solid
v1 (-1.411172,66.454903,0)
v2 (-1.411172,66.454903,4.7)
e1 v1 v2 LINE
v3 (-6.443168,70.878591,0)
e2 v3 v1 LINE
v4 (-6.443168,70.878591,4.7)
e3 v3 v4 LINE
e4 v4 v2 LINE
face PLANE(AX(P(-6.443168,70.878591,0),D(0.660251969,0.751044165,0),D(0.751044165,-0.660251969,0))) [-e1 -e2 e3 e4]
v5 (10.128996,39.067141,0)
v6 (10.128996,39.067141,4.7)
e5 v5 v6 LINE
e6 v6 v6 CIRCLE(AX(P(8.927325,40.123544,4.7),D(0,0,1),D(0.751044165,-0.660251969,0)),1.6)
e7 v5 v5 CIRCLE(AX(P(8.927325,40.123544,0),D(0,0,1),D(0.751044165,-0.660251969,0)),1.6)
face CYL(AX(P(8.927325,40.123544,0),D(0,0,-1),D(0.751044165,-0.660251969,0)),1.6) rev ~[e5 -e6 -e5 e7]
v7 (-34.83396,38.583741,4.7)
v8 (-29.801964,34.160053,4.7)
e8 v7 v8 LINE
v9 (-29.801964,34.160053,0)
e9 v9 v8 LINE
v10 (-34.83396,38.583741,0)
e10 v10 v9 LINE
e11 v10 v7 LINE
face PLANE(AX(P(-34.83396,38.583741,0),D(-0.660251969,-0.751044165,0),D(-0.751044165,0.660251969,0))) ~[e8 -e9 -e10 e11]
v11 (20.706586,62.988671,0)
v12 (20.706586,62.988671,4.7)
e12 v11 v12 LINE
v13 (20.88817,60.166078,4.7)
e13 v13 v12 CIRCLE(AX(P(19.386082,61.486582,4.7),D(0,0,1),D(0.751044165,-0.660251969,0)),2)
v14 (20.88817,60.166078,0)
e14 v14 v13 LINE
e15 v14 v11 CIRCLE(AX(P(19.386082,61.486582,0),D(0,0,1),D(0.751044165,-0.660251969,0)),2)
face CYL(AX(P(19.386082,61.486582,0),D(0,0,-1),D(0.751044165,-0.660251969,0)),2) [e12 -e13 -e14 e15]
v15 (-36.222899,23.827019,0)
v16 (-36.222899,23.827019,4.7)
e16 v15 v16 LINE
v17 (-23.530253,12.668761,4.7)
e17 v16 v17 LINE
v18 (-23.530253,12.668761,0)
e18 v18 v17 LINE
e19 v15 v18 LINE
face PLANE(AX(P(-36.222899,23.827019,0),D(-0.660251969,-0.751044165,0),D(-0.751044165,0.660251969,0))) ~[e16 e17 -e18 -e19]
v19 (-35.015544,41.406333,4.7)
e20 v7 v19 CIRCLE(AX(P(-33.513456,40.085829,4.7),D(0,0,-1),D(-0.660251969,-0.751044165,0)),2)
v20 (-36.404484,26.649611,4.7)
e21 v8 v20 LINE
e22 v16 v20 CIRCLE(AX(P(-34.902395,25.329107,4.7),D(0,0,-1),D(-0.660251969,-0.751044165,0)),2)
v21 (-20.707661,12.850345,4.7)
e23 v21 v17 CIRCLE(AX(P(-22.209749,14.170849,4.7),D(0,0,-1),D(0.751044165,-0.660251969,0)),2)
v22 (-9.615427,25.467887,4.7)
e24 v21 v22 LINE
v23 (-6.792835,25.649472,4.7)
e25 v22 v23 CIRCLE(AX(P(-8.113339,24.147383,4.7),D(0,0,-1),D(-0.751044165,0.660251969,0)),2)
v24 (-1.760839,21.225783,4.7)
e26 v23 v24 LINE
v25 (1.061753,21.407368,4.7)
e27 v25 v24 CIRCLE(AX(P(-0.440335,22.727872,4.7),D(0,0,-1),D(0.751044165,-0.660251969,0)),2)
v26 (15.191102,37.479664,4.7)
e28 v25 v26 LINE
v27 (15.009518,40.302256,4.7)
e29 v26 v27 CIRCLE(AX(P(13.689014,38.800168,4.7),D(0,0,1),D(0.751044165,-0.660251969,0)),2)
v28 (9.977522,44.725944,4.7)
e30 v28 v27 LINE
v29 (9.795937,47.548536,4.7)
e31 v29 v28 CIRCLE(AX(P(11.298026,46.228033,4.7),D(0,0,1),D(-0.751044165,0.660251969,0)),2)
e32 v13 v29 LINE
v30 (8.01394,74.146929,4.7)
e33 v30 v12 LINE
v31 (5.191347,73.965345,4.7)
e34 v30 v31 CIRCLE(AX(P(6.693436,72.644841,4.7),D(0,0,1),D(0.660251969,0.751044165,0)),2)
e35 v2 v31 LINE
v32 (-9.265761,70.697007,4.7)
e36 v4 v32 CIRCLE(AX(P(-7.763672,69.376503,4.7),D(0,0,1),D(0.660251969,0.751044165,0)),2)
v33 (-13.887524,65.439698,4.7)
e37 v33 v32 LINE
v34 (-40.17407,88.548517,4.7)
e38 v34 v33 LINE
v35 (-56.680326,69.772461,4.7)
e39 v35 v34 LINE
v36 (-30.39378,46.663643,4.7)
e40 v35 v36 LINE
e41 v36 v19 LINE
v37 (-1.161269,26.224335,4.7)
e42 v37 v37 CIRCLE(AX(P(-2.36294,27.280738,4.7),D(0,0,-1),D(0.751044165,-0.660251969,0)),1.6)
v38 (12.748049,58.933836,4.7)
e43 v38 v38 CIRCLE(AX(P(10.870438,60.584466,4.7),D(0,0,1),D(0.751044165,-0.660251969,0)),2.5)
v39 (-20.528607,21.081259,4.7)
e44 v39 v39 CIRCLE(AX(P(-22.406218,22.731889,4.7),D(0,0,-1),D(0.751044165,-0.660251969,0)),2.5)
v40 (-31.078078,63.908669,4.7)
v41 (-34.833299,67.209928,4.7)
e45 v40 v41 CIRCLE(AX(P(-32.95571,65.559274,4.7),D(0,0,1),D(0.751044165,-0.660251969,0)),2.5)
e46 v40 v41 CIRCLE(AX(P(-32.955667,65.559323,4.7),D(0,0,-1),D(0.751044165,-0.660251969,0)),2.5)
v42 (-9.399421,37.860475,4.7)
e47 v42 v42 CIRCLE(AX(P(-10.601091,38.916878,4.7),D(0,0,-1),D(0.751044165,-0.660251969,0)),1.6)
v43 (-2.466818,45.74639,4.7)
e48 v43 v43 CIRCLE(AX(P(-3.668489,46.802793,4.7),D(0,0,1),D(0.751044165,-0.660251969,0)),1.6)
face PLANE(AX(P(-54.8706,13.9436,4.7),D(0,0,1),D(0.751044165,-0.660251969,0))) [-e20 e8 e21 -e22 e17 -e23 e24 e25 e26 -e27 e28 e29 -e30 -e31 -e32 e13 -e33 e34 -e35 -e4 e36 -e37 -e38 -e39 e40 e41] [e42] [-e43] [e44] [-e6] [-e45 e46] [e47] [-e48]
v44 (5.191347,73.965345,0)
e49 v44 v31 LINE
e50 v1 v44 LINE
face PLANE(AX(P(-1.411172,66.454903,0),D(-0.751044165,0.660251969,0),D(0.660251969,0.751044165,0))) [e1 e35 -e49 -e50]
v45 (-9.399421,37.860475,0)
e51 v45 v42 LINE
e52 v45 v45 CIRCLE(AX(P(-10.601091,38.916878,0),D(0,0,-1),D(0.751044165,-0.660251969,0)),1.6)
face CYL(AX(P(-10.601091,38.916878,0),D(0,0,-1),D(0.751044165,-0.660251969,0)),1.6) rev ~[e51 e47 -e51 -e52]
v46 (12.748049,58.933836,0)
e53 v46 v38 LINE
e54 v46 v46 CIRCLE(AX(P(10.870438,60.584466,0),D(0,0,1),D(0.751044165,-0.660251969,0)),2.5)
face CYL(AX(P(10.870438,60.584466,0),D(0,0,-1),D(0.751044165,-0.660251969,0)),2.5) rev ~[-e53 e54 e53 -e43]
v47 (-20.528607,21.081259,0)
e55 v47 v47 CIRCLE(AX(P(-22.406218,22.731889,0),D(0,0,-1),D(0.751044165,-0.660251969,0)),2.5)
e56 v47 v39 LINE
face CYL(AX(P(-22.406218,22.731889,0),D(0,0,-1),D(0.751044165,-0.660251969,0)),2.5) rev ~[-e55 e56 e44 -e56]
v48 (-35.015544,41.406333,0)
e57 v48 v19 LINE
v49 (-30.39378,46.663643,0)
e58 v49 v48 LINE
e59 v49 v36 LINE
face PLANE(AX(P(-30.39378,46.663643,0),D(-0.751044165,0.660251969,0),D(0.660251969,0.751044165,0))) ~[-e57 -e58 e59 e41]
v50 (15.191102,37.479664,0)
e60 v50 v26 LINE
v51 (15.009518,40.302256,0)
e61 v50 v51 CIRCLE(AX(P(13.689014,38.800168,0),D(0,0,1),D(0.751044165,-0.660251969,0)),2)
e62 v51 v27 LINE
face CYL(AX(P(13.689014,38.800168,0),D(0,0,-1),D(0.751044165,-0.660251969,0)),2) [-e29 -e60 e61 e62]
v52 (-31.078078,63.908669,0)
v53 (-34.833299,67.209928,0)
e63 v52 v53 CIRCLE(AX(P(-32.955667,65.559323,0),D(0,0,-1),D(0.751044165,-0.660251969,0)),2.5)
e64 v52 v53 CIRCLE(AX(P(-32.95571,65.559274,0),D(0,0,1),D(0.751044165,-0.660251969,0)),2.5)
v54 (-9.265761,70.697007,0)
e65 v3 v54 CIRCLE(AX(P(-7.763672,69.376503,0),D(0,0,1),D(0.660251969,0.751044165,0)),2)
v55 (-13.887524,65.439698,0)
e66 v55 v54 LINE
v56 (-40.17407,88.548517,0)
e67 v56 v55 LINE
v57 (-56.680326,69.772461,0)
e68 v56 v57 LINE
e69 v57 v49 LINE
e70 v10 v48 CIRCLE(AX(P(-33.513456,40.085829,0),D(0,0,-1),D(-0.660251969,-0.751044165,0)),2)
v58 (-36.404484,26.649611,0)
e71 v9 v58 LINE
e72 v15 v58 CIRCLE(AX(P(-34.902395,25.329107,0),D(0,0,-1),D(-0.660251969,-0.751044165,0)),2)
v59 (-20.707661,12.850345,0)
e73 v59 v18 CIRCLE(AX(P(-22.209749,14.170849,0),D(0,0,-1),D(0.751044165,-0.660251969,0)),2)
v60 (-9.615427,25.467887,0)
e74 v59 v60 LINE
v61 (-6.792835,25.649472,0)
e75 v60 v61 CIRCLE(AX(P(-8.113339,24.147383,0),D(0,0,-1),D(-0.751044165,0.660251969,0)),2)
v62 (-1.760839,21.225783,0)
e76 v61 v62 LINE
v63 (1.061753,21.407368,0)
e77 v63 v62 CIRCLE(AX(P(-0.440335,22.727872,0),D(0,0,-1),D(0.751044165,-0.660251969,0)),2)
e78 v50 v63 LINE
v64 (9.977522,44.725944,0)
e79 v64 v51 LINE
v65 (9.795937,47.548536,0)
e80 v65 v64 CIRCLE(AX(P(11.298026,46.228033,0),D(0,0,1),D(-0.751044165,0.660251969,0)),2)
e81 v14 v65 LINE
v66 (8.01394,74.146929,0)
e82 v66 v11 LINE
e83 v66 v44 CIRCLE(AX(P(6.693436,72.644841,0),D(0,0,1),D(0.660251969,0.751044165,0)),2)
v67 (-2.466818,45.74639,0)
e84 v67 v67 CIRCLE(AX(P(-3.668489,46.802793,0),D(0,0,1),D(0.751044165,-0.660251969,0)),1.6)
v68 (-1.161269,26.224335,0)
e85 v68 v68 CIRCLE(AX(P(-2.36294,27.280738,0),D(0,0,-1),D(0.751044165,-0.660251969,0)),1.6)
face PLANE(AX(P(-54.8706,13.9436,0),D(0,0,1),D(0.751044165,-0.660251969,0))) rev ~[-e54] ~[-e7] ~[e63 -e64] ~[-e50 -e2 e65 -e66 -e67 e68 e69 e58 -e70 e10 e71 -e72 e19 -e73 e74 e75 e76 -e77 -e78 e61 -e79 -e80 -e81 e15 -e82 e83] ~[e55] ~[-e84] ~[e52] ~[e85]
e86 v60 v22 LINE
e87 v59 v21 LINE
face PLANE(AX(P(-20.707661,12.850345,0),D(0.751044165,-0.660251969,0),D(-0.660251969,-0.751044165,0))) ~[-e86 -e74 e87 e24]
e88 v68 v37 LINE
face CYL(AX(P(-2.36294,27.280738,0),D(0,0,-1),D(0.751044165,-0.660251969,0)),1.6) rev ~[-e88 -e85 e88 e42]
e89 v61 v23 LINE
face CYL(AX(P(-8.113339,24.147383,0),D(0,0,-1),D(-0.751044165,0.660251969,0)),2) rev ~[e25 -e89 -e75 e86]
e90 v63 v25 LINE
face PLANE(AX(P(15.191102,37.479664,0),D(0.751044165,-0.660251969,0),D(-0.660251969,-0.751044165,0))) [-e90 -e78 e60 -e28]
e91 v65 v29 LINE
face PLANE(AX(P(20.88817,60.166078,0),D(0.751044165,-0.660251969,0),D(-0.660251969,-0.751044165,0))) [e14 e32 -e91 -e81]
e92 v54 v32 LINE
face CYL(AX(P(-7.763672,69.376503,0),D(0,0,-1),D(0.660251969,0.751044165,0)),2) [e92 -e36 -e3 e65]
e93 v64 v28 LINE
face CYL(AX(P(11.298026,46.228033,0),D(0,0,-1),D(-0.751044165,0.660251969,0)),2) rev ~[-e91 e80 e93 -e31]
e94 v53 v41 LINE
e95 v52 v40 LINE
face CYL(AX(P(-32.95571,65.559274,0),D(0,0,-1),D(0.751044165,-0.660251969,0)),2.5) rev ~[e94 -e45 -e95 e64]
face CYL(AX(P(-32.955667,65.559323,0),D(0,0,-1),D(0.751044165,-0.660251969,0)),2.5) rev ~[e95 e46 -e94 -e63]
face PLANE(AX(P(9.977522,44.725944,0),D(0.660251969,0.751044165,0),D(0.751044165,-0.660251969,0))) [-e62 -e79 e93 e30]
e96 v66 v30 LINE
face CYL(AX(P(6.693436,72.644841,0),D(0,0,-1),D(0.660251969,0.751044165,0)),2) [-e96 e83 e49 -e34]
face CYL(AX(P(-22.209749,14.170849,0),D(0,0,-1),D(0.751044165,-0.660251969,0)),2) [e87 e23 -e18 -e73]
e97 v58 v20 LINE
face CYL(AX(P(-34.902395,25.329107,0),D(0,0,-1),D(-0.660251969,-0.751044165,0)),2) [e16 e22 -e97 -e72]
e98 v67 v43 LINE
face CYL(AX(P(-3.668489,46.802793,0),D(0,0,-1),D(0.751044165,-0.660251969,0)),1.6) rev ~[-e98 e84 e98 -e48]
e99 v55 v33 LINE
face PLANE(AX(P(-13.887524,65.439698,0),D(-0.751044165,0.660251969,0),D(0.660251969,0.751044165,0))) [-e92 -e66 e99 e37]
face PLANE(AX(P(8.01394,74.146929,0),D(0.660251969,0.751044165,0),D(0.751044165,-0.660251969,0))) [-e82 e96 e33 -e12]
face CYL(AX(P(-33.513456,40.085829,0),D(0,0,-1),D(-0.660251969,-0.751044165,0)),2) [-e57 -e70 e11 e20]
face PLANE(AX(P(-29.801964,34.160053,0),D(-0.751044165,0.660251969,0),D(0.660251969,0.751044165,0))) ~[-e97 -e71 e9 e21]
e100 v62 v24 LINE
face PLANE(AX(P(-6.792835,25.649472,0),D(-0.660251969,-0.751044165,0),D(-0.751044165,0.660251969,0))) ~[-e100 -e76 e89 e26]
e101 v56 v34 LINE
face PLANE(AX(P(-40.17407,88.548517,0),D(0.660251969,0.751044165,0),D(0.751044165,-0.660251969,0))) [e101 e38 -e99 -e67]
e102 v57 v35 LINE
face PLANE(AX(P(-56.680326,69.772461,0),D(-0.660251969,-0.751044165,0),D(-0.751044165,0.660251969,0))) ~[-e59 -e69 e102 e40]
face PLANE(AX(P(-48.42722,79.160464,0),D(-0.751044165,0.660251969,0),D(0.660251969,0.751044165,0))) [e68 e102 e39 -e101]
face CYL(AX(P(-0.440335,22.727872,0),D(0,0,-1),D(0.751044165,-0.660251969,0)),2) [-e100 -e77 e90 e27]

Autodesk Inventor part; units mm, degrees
ref_plane "YZ Plane" through (0, 0, 0) normal (1, 0, 0) x (0, 1, 0)
ref_plane "XZ Plane" through (0, 0, 0) normal (0, 1, 0) x (-1, 0, 0)
ref_plane "XY Plane" through (0, 0, 0) normal (0, 0, 1) x (1, 0, 0)
ref_plane "Work Plane1" through (-54.8706, 13.9436, 0) normal (0, 0, 1) x (0.7510442, -0.660252, 0)
sketch "Sketch1" plane through (-54.8706, 13.9436, 0) normal (0, 0, 1) x (0.7510442, -0.660252, 0)
  line L0 (-38.2203, 53.235) -> (-38.2203, 65.735)
  line L1 (-38.2203, 65.735) -> (-3.2203, 65.735)
  line L2 (-3.2203, 65.735) -> (-3.2203, 72.735)
  line L3 (-1.2203, 74.735) -> (5.4797, 74.735)
  line L4 (5.4797, 74.735) -> (5.4797, 84.735)
  line L5 (7.4797, 86.735) -> (24.3797, 86.735)
  line L6 (26.3797, 84.735) -> (26.3797, 67.935)
  line L7 (28.3797, 65.935) -> (35.0797, 65.935)
  line L8 (37.0797, 63.935) -> (37.0797, 53.235)
  arc A0 (37.0797, 63.935) -> (35.0797, 65.935) centre (35.0797, 63.935) ccw
  arc A1 (26.3797, 67.935) -> (28.3797, 65.935) centre (28.3797, 67.935) ccw
  arc A2 (26.3797, 84.735) -> (24.3797, 86.735) centre (24.3797, 84.735) ccw
  arc A3 (7.4797, 86.735) -> (5.4797, 84.735) centre (7.4797, 84.735) ccw
  arc A4 (-1.2203, 74.735) -> (-3.2203, 72.735) centre (-1.2203, 72.735) ccw
  circle A5 centre (30.6297, 61.785) radius 1.6
  circle A6 centre (16.7597, 58.485) radius 1.6
  circle A7 centre (18.5797, 78.435) radius 2.5
  circle A8 centre (-17.6203, 53.235) radius 2.5
  line L9 (37.0797, 53.235) -> (-15.1203, 53.235)
  line L10 (-20.1203, 53.235) -> (-38.2203, 53.235)
  point P0 (50.4165, 25.7562)
  dimension "d1" = 35
  dimension "d2" = 9
  dimension "d3" = 8.7
  dimension "d4" = 12
  dimension "d5" = 20.9
  dimension "d6" = 20.8
  dimension "d7" = 10.7
  dimension "d8" = 2
  dimension "d9" = 3.2
  dimension "d10" = 3.2
  dimension "d11" = 5
  dimension "d12" = 5
  dimension "d13" = 20.6
  dimension "d14" = 7.8
  dimension "d15" = 8.3
  dimension "d16" = 4.15
  dimension "d17" = 6.45
  dimension "d18" = 20.32
extrude "Extrusion1" add sketch "Sketch1" along normal blind 4.7 contours L0 L1 L2 A4 L3 L4 A3 L5 A2 L6 A1 L7 A0 L8 L9 A8 L10
mirror "Mirror1" about plane through (-31.078, 63.9086, 0) normal (-0.660252, -0.7510442, 0) of "Extrusion1"
properties part number "Neje_Base_Slide_y"
